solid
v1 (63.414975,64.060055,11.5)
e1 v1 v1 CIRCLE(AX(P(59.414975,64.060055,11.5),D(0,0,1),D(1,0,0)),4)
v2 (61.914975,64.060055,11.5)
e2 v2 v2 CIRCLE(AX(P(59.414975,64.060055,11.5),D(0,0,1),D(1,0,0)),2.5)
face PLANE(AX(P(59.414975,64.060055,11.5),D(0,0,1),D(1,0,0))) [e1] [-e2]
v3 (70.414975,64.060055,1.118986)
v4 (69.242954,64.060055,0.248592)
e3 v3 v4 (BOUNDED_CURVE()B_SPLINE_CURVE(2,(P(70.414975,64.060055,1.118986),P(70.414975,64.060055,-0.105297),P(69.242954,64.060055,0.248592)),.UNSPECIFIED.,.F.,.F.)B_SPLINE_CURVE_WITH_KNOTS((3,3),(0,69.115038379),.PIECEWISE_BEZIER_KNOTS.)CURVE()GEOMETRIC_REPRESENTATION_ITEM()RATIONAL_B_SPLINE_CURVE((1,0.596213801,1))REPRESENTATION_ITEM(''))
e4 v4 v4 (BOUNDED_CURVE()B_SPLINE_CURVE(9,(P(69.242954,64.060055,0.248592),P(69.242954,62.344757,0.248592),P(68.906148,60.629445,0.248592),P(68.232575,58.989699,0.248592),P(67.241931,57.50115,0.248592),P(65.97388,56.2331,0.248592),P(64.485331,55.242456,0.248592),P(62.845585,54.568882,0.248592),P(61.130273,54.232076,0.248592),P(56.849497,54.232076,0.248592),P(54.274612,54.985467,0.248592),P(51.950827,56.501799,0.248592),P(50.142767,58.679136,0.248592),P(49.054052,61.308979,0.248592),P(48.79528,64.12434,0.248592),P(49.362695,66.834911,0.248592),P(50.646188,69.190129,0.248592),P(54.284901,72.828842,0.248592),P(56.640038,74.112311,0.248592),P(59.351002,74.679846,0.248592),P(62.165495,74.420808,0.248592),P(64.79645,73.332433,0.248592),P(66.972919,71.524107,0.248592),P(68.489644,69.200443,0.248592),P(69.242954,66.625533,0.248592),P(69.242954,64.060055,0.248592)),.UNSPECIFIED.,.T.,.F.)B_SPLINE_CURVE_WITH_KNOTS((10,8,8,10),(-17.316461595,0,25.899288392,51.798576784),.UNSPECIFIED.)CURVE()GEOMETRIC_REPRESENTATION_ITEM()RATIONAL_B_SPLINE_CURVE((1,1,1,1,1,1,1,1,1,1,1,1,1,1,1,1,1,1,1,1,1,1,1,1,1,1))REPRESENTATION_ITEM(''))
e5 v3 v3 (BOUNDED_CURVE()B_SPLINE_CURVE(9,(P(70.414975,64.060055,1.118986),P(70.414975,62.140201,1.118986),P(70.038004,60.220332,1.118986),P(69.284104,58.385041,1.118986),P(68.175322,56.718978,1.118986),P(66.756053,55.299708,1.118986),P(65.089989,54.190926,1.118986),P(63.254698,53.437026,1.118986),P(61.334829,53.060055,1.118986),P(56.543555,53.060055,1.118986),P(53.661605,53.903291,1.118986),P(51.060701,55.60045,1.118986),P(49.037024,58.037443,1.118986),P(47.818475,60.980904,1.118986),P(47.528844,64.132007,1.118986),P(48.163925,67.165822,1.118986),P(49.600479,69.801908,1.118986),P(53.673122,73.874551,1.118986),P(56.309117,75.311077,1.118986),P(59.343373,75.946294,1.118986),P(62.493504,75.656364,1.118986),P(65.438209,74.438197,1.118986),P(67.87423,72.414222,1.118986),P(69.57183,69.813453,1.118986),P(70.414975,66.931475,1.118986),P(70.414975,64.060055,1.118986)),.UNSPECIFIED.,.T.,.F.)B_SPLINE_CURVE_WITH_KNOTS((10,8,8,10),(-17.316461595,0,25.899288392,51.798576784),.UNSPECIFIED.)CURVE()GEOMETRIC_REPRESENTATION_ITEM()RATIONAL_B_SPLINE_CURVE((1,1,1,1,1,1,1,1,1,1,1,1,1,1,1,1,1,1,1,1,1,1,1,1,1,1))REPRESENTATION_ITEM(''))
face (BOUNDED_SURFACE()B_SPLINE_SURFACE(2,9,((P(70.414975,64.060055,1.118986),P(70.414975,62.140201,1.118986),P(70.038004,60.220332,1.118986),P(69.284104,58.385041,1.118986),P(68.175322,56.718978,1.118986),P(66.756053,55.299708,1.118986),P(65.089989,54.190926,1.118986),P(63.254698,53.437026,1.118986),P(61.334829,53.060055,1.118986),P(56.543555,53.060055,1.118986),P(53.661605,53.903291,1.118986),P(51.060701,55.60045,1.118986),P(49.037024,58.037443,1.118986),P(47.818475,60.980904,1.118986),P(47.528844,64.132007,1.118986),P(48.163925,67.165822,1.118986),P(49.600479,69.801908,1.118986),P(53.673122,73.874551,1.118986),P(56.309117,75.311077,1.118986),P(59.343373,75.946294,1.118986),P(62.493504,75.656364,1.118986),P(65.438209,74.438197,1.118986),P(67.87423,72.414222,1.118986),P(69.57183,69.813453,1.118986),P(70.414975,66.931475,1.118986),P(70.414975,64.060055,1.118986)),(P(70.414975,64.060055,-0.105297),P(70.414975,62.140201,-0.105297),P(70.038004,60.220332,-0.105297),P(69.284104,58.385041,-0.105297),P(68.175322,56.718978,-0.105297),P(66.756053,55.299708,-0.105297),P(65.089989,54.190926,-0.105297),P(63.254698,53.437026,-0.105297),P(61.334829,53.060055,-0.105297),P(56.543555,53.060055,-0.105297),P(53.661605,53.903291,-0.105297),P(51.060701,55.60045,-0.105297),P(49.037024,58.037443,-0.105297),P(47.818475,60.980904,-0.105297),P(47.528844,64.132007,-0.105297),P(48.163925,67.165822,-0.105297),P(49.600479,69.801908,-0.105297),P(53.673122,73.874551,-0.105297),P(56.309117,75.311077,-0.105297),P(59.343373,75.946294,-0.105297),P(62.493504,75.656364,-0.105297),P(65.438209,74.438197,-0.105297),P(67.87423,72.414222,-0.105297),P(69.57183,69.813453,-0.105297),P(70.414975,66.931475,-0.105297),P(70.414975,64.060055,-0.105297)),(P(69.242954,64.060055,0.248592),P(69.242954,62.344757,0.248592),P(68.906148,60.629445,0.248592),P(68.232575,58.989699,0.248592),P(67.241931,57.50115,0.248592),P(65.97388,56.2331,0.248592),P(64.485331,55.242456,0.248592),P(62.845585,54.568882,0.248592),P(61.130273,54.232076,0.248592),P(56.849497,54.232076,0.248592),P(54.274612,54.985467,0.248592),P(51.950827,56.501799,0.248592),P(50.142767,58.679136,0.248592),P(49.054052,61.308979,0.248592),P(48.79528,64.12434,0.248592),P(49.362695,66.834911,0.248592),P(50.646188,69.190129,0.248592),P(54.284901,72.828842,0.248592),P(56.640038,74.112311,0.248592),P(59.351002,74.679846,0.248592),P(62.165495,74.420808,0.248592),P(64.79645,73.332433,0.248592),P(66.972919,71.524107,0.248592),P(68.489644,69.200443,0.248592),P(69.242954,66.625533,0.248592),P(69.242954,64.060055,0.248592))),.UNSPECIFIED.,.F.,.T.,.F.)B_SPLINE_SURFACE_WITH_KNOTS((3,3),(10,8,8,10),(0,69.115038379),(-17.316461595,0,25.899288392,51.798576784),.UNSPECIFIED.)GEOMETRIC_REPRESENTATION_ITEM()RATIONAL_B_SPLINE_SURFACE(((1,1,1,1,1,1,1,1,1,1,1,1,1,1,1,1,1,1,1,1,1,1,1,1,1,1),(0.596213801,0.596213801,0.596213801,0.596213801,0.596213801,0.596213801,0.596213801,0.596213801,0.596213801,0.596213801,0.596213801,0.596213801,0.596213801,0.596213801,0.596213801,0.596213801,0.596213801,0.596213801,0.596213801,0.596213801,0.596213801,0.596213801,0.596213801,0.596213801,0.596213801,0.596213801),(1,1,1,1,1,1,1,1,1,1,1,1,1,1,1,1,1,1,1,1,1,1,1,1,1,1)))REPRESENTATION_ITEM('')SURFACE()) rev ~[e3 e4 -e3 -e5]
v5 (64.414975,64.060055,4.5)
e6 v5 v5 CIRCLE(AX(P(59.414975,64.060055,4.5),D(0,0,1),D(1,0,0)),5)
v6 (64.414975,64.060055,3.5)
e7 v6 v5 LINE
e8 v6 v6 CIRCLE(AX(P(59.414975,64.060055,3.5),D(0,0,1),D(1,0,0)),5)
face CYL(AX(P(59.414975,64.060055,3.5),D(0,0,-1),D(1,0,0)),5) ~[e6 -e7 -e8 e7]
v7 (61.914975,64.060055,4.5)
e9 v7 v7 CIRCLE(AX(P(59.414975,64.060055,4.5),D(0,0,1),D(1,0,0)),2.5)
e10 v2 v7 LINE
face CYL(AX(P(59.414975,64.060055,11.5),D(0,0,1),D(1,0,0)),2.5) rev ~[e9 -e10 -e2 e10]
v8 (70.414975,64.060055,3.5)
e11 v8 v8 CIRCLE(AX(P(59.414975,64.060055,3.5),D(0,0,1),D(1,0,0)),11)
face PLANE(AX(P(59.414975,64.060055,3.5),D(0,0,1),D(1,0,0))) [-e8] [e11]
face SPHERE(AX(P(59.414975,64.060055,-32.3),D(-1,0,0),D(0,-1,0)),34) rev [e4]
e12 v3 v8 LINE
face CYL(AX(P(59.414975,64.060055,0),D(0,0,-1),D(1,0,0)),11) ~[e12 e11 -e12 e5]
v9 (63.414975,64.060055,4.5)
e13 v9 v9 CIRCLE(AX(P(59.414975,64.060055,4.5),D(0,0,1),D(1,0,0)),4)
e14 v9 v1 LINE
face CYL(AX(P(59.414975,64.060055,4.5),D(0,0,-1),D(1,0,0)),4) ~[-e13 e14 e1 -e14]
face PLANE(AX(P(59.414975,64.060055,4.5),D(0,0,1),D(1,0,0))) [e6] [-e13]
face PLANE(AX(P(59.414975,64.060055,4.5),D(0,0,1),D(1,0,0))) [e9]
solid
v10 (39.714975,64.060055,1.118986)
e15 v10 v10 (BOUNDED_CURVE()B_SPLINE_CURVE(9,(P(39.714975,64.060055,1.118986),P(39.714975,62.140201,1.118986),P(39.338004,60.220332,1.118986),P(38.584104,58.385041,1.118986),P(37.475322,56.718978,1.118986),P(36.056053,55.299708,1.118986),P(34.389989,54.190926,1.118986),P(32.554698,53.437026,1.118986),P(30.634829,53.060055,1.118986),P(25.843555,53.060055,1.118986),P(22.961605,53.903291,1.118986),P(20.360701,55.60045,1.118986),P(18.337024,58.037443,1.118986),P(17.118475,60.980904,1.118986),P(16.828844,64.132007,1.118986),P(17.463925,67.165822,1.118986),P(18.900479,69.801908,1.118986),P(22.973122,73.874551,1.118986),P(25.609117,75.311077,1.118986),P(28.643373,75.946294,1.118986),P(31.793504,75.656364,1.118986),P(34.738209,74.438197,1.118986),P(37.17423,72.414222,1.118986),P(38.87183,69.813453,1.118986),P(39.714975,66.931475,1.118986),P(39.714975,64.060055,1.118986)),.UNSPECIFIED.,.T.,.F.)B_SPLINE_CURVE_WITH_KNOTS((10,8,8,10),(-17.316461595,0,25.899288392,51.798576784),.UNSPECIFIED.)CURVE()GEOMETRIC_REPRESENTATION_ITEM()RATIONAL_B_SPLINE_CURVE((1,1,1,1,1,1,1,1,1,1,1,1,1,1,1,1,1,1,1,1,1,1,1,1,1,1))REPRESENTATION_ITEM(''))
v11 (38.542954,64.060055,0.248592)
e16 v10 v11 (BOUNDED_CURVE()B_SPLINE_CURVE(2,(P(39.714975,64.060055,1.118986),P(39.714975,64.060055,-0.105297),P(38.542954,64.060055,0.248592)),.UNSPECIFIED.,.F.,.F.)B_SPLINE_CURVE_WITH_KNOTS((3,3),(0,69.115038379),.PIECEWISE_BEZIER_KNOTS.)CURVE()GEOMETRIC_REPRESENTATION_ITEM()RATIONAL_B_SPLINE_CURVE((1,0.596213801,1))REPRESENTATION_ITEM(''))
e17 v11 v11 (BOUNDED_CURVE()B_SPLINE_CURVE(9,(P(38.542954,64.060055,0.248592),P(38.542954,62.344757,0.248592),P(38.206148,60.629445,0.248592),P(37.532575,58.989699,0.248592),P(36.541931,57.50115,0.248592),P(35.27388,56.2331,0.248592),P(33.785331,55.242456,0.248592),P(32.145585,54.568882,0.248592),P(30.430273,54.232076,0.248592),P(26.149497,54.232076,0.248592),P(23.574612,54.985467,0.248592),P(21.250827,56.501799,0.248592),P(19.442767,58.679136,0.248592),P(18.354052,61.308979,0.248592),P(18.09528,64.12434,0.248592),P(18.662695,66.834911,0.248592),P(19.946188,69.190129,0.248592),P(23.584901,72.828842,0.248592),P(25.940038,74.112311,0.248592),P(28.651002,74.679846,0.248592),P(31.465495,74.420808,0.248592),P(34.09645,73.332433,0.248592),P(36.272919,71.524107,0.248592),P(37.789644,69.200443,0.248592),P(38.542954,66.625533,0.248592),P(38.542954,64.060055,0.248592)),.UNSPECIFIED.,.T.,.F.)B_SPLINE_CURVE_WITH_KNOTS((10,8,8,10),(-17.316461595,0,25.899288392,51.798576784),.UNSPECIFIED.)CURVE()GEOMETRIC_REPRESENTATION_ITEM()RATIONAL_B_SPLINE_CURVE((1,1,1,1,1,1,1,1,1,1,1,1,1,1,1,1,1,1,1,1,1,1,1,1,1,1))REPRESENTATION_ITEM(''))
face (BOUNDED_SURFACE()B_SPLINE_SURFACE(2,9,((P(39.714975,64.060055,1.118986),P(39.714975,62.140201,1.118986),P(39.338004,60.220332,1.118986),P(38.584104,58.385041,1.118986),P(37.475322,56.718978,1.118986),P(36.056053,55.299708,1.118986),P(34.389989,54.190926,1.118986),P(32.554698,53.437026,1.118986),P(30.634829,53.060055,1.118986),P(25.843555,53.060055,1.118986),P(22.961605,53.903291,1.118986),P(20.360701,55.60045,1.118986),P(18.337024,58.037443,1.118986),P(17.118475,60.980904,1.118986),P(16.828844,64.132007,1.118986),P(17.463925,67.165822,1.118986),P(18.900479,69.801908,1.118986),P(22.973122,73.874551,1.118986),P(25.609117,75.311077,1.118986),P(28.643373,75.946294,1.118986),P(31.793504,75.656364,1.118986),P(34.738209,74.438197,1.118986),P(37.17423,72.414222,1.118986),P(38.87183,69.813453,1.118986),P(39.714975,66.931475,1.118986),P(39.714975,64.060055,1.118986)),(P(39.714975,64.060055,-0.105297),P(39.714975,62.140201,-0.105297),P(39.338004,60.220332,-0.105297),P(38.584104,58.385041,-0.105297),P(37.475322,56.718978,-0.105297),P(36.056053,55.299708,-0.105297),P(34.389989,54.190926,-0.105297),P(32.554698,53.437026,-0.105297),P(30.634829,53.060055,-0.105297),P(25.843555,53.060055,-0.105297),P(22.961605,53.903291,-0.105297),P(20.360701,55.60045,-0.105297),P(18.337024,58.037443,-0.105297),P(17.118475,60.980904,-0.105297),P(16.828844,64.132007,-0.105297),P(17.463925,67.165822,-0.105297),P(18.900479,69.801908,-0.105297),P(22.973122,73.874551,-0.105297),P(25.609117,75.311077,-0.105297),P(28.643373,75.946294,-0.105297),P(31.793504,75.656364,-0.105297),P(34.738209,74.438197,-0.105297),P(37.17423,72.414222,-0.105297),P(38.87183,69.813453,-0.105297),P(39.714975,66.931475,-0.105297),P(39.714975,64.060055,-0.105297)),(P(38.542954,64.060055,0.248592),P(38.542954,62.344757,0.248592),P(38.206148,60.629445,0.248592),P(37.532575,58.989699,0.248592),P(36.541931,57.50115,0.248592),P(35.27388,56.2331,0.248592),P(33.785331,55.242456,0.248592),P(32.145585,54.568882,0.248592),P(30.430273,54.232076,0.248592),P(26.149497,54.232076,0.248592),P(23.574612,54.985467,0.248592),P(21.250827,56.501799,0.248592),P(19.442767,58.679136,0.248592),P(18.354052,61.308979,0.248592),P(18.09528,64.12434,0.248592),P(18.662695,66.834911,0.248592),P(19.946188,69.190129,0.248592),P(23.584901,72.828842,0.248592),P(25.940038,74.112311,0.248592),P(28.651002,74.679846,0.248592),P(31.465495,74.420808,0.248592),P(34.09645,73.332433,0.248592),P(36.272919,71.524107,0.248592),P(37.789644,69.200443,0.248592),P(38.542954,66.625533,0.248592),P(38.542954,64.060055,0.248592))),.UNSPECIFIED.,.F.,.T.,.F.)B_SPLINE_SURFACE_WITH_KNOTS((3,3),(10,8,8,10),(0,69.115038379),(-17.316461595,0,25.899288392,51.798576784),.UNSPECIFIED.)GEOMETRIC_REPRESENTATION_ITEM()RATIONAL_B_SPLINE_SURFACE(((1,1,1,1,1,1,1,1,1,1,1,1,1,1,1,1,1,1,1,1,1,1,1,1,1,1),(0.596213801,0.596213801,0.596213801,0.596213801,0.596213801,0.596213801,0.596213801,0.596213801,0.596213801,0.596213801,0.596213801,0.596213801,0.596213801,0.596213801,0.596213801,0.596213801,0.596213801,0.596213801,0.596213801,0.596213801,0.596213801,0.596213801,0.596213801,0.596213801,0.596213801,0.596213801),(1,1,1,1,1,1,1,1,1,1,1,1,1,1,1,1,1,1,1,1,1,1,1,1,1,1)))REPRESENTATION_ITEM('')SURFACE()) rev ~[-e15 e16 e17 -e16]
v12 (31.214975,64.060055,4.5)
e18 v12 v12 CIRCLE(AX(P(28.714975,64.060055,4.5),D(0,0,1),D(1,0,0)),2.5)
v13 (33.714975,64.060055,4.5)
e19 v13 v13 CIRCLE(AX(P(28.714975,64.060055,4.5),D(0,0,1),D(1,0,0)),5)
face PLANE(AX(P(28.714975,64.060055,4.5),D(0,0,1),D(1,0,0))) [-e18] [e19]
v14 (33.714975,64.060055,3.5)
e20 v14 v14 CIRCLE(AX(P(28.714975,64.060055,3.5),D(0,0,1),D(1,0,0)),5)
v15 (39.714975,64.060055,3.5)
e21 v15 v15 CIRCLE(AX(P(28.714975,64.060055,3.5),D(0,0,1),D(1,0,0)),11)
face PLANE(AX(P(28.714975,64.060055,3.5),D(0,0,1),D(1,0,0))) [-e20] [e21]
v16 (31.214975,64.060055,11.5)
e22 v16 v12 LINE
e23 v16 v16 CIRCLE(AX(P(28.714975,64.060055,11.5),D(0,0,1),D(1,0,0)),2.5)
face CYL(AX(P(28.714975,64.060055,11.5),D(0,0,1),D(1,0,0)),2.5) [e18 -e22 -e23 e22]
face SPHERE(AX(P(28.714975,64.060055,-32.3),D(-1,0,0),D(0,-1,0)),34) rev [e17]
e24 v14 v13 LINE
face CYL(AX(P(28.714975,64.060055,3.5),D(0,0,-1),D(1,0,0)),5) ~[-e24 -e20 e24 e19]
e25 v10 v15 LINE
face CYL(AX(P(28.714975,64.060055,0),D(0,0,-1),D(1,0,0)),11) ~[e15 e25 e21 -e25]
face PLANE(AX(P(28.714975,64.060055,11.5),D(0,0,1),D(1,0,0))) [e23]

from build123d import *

# Parameters (mm, degrees)
F0_R      = 11
F1_DEPTH  = 3.5
F2_R      = 5
F3_DEPTH  = 1
F4_R      = 4
F5_DEPTH  = 7
F6_R      = 1.3518679975
F7_DEPTH  = 32.3
F11_R     = 0.9092071391
F13_R     = 2.5
F14_DEPTH = 7
F15_R     = 4
F15_R_2   = 2.5
F16_DEPTH = 7


# Not quite as in the source:
# - a fillet or chamfer that OpenCascade refuses, or shapes differently, is made with other operations: its cross-section is extruded or revolved along the edge and cut away or added
# - a feature names something its author has since deleted; it is built from what else it names


with BuildPart() as f1:
    # F0 (on Top) → F1 (new body)
    with BuildSketch(Plane.XY):
        with Locations((59.4149753451, 64.0600547194)):
            Circle(F0_R)
    extrude(amount=F1_DEPTH)

    # F2 (on face) → F3 (join)
    with BuildSketch(Plane.XY.offset(3.5)):
        with Locations((59.4149753451, 64.0600547194)):
            Circle(F2_R)
    extrude(amount=F3_DEPTH)

    # F4 (on face) → F5 (join)
    with BuildSketch(Plane.XY.offset(4.5)):
        with Locations((59.4149753451, 64.0600547194)):
            Circle(F4_R)
    extrude(amount=F5_DEPTH)

    # F6 (on face) → F7 (join)
    with BuildSketch(Plane(origin=(0, 0, 0), x_dir=(1, 0, 0), z_dir=(0, 0, -1))):
        with Locations((59.4149753451, -64.0600547194)):
            Circle(F6_R)
    extrude(amount=F7_DEPTH)

    # F8 (on face) → F9 (revolve, cut)
    with BuildSketch(Plane(origin=(0, 0, -32.3), x_dir=(1, 0, 0), z_dir=(0, 0, -1))):
        with BuildLine():
            Line((60.7668433426, -64.0600547194), (93.4149753451, -64.0600547194))
            ThreePointArc((93.4149753451, -64.0600547194), (59.4149753451, -30.0600547194), (25.4149753451, -64.0600547194))
            Line((25.4149753451, -64.0600547194), (58.0631073476, -64.0600547194))
            ThreePointArc((58.0631073476, -64.0600547194), (59.4149753451, -62.7081867219), (60.7668433426, -64.0600547194))
        make_face()
        with BuildLine():
            Line((59.4149753451, -64.0600547194), (60.7668433426, -64.0600547194))
            ThreePointArc((60.7668433426, -64.0600547194), (59.4149753451, -62.7081867219), (58.0631073476, -64.0600547194))
            Line((58.0631073476, -64.0600547194), (59.4149753451, -64.0600547194))
        make_face()
    revolve(axis=Axis((76.4149753451, 64.0600547194, -32.3), (1, 0, 0)), mode=Mode.SUBTRACT)

    # F10: fillet of radius 5 on 1 edges, made by hand

    # F10_s1 → F10_t2 (revolve, cut)
    with BuildSketch(Plane.YZ.offset(59.4149753451)):
        with BuildLine():
            ThreePointArc((52.67102491, 0), (53.4091792265, 0.0547873448), (54.1311569369, 0.2179487179))
            ThreePointArc((54.1311569369, 0.2179487179), (53.7867795374, 0.1107978463), (53.4435581222, 0))
            Line((53.4435581222, 0), (52.67102491, 0))
        make_face()
    revolve(axis=Axis((59.4149753451, 64.0600547194, 0), (0, 0, 1)), mode=Mode.SUBTRACT)

    # F11
    f11_edges = [f1.edges().sort_by_distance(p)[0] for p in [
        (51.636801, 71.838229, 0.015157),
        (67.19315, 56.28188, 0.015157),
    ]]
    fillet(f11_edges, radius=F11_R)


with BuildPart() as f12_1:
    # F12: copy of F1
    add(f1.part.moved(Location((-30.7, 0, 0))))

    # F15 (on face) → F16 (cut)
    with BuildSketch(Plane.XY.offset(11.5)):
        with Locations((28.7149753451, 64.0600547194)):
            Circle(F15_R)
        with Locations((28.7149753451, 64.0600547194)):
            Circle(F15_R_2, mode=Mode.SUBTRACT)
    extrude(amount=-F16_DEPTH, mode=Mode.SUBTRACT)


with BuildPart() as f1_1:
    add(f1.part)

    # F13 (on face) → F14 (cut)
    with BuildSketch(Plane.XY.offset(11.5)):
        with Locations((59.4149753451, 64.0600547194)):
            Circle(F13_R)
    extrude(amount=-F14_DEPTH, mode=Mode.SUBTRACT)


solid = Compound([f12_1.part, f1_1.part])
